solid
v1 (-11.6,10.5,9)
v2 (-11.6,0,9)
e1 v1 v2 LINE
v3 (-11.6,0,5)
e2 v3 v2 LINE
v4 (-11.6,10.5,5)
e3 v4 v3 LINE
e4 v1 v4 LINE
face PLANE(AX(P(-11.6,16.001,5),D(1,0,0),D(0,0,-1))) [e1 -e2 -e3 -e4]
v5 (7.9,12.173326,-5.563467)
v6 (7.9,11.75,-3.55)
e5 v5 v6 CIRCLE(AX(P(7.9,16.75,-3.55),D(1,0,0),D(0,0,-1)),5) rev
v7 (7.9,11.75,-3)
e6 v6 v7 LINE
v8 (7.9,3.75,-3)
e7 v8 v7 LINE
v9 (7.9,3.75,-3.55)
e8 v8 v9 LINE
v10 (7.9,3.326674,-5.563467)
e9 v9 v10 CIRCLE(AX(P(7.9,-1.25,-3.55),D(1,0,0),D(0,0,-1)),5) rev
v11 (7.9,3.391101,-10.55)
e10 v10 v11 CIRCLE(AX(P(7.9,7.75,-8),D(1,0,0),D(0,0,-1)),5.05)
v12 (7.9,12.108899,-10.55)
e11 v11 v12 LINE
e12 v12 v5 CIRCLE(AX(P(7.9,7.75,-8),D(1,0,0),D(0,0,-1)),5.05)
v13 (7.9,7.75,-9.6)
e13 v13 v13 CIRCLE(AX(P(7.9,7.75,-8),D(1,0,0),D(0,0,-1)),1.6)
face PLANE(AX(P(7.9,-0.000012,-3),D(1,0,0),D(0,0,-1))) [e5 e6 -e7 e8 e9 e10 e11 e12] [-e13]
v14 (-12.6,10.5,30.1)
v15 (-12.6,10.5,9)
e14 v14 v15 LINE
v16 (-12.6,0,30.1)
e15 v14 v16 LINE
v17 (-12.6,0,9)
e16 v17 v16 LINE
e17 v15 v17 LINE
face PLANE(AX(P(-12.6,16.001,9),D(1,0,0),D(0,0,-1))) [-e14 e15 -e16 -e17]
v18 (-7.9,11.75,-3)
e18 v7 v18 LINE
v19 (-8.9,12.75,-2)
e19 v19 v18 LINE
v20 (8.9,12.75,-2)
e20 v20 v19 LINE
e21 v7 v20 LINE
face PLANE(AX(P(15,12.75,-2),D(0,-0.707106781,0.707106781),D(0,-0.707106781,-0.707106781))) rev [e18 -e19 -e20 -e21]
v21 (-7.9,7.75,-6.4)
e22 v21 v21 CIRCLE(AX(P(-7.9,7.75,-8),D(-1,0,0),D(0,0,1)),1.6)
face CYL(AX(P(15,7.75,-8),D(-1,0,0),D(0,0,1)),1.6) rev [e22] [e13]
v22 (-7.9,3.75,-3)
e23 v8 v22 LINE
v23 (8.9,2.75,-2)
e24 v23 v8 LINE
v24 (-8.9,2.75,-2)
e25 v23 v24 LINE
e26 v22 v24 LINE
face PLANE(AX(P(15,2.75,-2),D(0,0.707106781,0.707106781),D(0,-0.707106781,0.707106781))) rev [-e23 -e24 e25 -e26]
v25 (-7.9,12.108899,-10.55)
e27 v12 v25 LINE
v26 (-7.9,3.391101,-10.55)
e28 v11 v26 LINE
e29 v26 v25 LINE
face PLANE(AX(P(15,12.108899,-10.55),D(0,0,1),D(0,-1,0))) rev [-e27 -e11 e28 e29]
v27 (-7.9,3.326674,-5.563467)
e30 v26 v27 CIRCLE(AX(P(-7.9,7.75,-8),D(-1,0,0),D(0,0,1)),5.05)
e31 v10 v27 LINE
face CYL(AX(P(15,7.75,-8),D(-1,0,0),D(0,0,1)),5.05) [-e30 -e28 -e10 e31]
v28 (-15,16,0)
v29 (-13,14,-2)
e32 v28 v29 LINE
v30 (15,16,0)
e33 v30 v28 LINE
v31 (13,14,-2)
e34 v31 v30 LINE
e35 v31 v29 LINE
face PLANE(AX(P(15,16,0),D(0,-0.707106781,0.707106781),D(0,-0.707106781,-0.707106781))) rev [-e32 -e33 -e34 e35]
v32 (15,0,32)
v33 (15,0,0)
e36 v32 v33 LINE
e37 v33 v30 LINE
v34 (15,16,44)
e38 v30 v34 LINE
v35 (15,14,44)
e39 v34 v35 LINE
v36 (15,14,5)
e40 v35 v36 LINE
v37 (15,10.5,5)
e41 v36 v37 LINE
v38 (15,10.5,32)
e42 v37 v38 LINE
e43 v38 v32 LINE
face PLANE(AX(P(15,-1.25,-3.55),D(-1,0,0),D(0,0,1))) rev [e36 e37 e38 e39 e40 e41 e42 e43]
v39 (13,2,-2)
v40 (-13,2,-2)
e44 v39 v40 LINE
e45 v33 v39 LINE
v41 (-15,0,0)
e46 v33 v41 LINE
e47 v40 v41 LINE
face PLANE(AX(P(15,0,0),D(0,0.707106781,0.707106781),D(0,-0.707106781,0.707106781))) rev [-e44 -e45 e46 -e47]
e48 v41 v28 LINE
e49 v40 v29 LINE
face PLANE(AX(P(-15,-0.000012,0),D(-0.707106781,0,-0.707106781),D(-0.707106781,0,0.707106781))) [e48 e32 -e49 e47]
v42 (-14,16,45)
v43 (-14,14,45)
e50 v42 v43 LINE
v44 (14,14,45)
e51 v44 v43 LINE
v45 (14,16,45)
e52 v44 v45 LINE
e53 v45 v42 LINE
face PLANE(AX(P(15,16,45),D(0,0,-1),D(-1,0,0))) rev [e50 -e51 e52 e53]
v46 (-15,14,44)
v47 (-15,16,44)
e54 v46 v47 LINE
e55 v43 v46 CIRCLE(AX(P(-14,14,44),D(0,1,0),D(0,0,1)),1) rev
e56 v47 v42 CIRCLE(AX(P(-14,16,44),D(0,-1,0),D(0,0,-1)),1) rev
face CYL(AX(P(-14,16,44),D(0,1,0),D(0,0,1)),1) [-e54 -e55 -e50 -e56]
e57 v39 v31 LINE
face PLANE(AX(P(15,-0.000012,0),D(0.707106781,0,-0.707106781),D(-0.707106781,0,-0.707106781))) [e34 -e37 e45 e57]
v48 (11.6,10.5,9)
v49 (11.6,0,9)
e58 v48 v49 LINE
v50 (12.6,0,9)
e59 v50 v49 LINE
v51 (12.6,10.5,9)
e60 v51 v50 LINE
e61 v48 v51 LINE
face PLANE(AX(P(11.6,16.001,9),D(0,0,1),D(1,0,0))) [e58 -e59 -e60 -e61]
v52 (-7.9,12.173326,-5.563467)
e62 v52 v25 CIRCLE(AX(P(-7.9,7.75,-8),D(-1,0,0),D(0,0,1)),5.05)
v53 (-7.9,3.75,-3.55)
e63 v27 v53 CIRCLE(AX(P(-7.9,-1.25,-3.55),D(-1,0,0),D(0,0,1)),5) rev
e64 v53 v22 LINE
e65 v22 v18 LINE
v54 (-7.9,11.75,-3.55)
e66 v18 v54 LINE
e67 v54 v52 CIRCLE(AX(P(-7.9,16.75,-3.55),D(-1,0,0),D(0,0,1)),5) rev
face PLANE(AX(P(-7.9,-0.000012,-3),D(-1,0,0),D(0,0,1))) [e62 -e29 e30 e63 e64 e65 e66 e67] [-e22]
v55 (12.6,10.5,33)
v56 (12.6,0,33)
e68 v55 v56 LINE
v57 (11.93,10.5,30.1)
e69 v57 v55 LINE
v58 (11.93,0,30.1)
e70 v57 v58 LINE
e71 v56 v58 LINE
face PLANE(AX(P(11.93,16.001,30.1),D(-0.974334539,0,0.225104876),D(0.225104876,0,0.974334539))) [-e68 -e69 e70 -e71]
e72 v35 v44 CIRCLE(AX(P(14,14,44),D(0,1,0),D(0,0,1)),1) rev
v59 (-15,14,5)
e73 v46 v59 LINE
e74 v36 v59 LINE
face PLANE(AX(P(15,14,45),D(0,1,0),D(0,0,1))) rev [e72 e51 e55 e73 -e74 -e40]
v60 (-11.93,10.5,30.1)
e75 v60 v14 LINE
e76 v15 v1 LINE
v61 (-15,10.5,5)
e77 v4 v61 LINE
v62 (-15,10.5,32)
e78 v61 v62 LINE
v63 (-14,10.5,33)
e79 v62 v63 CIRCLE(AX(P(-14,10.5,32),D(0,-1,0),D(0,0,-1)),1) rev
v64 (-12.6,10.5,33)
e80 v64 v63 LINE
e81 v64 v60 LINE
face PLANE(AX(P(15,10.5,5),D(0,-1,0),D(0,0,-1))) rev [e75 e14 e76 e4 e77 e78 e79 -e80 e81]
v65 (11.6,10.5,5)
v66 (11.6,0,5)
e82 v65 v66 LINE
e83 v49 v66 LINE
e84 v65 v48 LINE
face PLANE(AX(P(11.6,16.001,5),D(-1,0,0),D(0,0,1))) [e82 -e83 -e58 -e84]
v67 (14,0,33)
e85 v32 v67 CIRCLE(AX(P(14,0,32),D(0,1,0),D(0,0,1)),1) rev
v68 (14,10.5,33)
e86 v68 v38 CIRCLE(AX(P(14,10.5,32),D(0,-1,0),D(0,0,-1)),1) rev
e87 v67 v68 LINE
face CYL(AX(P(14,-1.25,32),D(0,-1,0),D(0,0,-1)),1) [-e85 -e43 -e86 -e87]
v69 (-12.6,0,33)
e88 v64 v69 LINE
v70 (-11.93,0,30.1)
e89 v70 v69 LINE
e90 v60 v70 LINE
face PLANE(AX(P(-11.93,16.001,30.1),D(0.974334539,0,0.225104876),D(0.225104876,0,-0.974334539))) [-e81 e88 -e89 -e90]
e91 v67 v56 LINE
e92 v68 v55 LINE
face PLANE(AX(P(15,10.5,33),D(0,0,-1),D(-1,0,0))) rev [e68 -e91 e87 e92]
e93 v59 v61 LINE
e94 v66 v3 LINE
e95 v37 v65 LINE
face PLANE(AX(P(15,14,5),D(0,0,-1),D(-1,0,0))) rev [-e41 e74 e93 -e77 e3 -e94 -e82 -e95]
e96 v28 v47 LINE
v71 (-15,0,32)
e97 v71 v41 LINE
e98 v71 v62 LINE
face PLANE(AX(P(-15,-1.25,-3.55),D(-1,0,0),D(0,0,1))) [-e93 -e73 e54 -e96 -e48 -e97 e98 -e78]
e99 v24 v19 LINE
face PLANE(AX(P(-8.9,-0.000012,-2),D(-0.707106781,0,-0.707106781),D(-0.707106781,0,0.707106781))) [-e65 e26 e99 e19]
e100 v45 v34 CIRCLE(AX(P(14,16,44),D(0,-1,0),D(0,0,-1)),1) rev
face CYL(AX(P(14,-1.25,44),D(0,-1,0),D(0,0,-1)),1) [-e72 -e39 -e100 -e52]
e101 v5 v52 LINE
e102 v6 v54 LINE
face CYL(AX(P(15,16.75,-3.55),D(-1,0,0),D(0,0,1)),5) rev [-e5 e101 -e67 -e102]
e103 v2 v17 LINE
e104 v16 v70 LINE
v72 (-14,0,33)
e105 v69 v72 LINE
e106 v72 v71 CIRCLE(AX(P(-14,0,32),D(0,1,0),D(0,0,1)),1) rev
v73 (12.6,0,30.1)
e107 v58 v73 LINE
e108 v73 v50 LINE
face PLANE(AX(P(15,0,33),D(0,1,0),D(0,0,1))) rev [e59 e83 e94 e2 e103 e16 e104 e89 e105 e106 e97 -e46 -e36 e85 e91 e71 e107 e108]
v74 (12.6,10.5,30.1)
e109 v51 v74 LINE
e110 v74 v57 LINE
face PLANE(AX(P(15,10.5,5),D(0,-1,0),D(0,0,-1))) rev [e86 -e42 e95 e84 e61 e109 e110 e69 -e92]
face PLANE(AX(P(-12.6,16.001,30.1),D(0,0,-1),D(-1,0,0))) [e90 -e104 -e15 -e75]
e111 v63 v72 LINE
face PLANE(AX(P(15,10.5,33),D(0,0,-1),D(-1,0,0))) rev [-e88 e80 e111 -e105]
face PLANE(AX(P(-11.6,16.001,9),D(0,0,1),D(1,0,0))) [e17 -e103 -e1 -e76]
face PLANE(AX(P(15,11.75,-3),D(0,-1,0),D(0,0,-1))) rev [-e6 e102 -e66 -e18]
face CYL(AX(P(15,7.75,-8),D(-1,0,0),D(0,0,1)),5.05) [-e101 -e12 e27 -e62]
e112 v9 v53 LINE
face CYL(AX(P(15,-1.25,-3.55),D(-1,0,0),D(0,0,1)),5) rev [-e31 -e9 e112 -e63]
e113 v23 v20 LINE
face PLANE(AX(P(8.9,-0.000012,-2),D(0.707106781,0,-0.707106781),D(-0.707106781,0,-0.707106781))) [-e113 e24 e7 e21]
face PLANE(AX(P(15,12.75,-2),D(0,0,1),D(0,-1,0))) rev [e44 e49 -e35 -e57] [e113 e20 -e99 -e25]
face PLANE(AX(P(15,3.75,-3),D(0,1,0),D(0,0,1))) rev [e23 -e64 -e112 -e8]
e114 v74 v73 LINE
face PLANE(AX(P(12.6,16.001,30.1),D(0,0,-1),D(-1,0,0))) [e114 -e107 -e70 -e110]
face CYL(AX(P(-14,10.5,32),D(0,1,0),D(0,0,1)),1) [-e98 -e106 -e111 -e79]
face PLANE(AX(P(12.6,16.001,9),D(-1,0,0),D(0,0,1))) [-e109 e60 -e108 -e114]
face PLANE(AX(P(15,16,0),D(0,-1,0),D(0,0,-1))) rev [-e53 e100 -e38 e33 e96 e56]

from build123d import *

# Parameters (mm, degrees)
CROQUIS2_R                   = 1.6
SALIENTE_EXTRUIR1_DEPTH      = 15
CORTAR_EXTRUIR1_REACH        = 52.06
REDONDEO1_R                  = 1
CORTAR_EXTRUIR_L_MINA1_DEPTH = 16


# Read off the part's stored shape, not the designer's step: Cortar-Extruir-Lámina1
with BuildPart() as part:
    # Croquis2 → Saliente-Extruir1 (new, symmetric)
    with BuildSketch(Plane(origin=(0, 0, 0), x_dir=(0, 0, -1), z_dir=(1, 0, 0))):
        with BuildLine():
            Line((0, 16), (-45, 16))
            Line((-45, 16), (-45, 14))
            Line((-45, 14), (-5, 14))
            Line((-5, 14), (-5, 10.5))
            Line((-5, 10.5), (-33, 10.5))
            Line((-33, 10.5), (-33, 0))
            Line((-33, 0), (0, 0))
            Line((0, 0), (2, 2))
            Line((2, 2), (2, 2.75))
            Line((2, 2.75), (3, 3.75))
            Line((3, 3.75), (3.55, 3.75))
            ThreePointArc((3.55, 3.75), (4.578743846, 3.643024228), (5.563467425, 3.32667444))
            ThreePointArc((5.563467425, 3.32667444), (8.065241178, 2.700421444), (10.55, 3.391101056))
            Line((10.55, 3.391101056), (10.55, 12.108898944))
            ThreePointArc((10.55, 12.108898944), (8.065241178, 12.799578556), (5.563467425, 12.17332556))
            ThreePointArc((5.563467425, 12.17332556), (4.578743846, 11.856975772), (3.55, 11.75))
            Line((3.55, 11.75), (3, 11.75))
            Line((3, 11.75), (2, 12.75))
            Line((2, 12.75), (2, 14))
            Line((2, 14), (0, 16))
        make_face()
        with Locations((8, 7.75)):
            Circle(CROQUIS2_R, mode=Mode.SUBTRACT)
    extrude(amount=SALIENTE_EXTRUIR1_DEPTH, both=True)

    # Croquis3 → Cortar-Extruir1 (cut, up to next)
    with BuildSketch(Plane(origin=(0, 0, 0), x_dir=(1, 0, 0), z_dir=(0, 1, 0)), mode=Mode.PRIVATE) as cortar_extruir1_sk1:
        Polygon((11.6, -5), (-11.6, -5), (-11.6, -9), (-12.6, -9), (-12.6, -30.1), (-11.93, -30.1), (-12.6, -33), (12.6, -33), (11.93, -30.1), (12.6, -30.1), (12.6, -9), (11.6, -9), align=None)
    cortar_extruir1_tool1 = extrude(cortar_extruir1_sk1.sketch, amount=CORTAR_EXTRUIR1_REACH, mode=Mode.PRIVATE) & part.part
    add(cortar_extruir1_tool1.solids().sort_by_distance((0, 0, 19.104296))[0], mode=Mode.SUBTRACT)

    # Redondeo1
    redondeo1_edges = [part.edges().sort_by_distance(p)[0] for p in [
        (-15, 5.25, 33),
        (-15, 15, 45),
        (15, 15, 45),
        (15, 5.25, 33),
    ]]
    fillet(redondeo1_edges, radius=REDONDEO1_R)

    # Cortar-Extruir-Lámina1 outline → Cortar-Extruir-Lámina1 (cut)
    with BuildSketch(Plane(origin=(0, 0, 0), x_dir=(1, 0, 0), z_dir=(0, 1, 0))):
        Polygon((-15, 0), (-13, 2), (-8.9, 2), (-7.9, 3), (-7.9, 10.55), (-15, 10.55), align=None)
        Polygon((7.9, 3), (8.9, 2), (13, 2), (15, 0), (15, 10.55), (7.9, 10.55), align=None)
    extrude(amount=CORTAR_EXTRUIR_L_MINA1_DEPTH, mode=Mode.SUBTRACT)


solid = part.part
